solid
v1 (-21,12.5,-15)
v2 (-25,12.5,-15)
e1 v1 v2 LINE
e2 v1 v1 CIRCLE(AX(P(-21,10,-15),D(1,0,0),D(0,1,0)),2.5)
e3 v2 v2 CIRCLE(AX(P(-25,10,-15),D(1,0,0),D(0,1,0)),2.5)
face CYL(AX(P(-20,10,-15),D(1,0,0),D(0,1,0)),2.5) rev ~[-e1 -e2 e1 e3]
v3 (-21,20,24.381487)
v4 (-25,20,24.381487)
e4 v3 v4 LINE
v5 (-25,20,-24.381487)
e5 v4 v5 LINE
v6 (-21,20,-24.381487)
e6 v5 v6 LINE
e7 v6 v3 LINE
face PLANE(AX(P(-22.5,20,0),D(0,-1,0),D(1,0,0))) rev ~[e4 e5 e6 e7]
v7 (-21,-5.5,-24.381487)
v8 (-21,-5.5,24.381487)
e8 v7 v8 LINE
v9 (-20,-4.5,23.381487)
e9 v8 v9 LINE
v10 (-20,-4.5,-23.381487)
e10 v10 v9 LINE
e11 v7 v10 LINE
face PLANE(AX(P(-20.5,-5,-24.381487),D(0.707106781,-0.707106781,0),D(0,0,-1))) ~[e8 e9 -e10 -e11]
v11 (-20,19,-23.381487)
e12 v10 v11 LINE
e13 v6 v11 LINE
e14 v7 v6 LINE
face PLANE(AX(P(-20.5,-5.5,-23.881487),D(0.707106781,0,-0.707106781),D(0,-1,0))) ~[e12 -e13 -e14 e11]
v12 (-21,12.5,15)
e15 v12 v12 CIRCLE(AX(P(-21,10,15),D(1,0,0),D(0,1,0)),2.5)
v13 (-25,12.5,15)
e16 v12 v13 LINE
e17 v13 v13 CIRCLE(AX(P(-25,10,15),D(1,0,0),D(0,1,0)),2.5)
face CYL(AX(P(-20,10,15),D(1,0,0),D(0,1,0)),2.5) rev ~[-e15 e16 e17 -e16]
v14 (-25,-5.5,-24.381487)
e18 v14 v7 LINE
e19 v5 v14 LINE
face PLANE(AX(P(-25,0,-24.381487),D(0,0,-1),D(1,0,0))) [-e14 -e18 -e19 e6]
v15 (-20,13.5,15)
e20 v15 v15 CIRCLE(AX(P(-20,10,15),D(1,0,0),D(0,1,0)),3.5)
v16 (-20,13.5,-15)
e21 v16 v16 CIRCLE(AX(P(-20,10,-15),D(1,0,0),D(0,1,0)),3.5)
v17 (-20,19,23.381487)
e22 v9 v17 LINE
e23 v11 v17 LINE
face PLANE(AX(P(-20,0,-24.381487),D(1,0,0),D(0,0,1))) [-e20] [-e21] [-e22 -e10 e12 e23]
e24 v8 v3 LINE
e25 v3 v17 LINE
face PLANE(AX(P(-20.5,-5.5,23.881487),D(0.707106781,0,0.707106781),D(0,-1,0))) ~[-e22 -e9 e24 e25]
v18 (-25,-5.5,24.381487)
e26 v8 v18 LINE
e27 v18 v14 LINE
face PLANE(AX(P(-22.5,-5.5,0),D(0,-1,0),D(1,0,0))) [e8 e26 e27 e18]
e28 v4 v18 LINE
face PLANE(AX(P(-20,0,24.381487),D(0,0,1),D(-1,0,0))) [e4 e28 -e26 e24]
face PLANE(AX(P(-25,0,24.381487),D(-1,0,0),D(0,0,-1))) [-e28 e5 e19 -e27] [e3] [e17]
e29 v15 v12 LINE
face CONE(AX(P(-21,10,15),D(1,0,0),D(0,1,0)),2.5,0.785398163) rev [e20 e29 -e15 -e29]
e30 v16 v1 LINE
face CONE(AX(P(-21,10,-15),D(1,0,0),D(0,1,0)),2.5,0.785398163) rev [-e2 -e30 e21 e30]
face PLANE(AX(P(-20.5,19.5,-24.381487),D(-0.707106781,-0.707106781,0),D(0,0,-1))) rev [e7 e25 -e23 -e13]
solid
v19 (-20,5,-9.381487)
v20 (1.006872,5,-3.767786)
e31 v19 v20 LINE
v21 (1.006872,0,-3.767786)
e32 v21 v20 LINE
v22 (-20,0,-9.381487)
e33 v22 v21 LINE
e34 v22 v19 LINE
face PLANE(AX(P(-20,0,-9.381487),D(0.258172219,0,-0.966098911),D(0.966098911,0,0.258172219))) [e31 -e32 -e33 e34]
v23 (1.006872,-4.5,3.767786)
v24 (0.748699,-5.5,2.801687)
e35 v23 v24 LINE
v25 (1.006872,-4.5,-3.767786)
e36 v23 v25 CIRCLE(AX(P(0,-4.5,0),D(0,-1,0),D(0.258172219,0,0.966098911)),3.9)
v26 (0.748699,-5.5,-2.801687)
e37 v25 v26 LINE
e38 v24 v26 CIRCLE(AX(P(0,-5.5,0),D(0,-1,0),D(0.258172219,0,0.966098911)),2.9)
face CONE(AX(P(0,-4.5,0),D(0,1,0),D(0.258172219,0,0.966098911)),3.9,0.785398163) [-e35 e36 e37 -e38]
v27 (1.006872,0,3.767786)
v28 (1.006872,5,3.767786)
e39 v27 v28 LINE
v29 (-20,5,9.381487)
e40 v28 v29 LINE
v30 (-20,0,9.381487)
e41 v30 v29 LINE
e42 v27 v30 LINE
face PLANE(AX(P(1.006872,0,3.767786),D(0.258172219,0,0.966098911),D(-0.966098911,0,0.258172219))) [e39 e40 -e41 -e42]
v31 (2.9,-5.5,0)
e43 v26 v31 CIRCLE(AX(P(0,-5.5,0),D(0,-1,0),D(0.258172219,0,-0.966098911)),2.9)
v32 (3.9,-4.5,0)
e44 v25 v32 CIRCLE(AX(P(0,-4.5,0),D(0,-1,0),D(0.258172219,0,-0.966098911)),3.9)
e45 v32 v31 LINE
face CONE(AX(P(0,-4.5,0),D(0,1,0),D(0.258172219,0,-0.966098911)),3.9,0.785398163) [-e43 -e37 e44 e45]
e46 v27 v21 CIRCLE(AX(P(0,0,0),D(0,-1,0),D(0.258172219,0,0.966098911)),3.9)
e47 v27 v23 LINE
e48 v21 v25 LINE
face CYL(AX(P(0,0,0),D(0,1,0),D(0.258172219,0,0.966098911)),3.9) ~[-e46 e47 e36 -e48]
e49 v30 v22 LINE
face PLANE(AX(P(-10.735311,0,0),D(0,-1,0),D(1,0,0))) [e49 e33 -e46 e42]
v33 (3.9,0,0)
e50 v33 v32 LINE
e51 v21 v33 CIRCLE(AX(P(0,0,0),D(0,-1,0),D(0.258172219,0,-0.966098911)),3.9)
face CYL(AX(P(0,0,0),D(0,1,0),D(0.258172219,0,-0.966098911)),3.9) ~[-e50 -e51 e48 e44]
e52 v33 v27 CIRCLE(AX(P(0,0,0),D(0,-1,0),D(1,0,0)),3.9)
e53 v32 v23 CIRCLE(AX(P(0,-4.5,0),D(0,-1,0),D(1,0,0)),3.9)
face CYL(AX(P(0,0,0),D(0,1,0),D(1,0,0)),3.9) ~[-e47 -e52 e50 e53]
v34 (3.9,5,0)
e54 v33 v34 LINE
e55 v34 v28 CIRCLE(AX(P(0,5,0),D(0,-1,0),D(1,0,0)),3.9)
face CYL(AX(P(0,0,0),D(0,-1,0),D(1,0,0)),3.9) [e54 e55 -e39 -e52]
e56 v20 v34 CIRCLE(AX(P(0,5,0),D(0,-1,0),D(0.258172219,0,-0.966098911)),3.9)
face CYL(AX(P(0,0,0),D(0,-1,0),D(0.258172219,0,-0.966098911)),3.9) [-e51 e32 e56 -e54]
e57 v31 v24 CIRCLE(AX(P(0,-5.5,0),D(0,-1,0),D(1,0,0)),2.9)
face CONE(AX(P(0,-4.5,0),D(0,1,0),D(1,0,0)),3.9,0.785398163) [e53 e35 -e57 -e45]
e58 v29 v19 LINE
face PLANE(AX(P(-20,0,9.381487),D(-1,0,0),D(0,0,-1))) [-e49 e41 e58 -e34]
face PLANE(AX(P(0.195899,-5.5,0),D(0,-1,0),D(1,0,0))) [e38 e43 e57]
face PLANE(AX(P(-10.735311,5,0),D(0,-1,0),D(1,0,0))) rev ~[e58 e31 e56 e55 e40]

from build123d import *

# Parameters (mm, degrees)
F1_DEPTH  = 5.5
F2_DEPTH  = 5
F3_DEPTH  = 20
F4_R      = 2.5
F5_DEPTH  = 10
F6_SIZE   = 1
F6_2_SIZE = 1


with BuildPart() as f1:
    # F0 (on Front) → F1 (new body)
    with BuildSketch(Plane.XZ):
        with BuildLine():
            ThreePointArc((1.0068716538, -3.767785752), (3.0932830011, -2.3752053122), (3.9, 0))
            ThreePointArc((3.9, 0), (3.0932830011, 2.3752053122), (1.0068716538, 3.767785752))
            ThreePointArc((1.0068716538, 3.767785752), (-3.9, 0), (1.0068716538, -3.767785752))
        make_face()
    extrude(amount=F1_DEPTH)

    # F0 (on Front) → F2 (join)
    with BuildSketch(Plane.XZ):
        with BuildLine():
            ThreePointArc((1.0068716538, -3.767785752), (-3.9, 0), (1.0068716538, 3.767785752))
            Line((1.0068716538, 3.767785752), (-20, 9.3814870065))
            Line((-20, 9.3814870065), (-20, 0))
            Line((-20, 0), (-20, -9.3814870065))
            Line((-20, -9.3814870065), (1.0068716538, -3.767785752))
        make_face()
        with BuildLine():
            ThreePointArc((1.0068716538, -3.767785752), (3.0932830011, -2.3752053122), (3.9, 0))
            ThreePointArc((3.9, 0), (3.0932830011, 2.3752053122), (1.0068716538, 3.767785752))
            ThreePointArc((1.0068716538, 3.767785752), (-3.9, 0), (1.0068716538, -3.767785752))
        make_face()
    extrude(amount=-F2_DEPTH)

    # F6
    f6_edges = [f1.edges().sort_by_distance(p)[0] for p in [
        (-1.006872, -5.5, 3.767786),
    ]]
    chamfer(f6_edges, length=F6_SIZE)


with BuildPart() as f1b:
    # F0 (on Front) → F1, piece 2 (new body)
    with BuildSketch(Plane.XZ):
        Polygon((-20, 0), (-20, 9.3814870065), (-20, 24.3814870065), (-25, 24.3814870065), (-25, 0.7844285667), (-25, -9.3814870065), (-25, -24.3814870065), (-20, -24.3814870065), (-20, -9.3814870065), align=None)
    extrude(amount=F1_DEPTH)

    # F0 (on Front) → F3 (join)
    with BuildSketch(Plane.XZ):
        Polygon((-20, 0), (-20, 9.3814870065), (-20, 24.3814870065), (-25, 24.3814870065), (-25, 0.7844285667), (-25, -9.3814870065), (-25, -24.3814870065), (-20, -24.3814870065), (-20, -9.3814870065), align=None)
    extrude(amount=-F3_DEPTH)

    # F4 (on face) → F5 (cut)
    with BuildSketch(Plane.YZ.offset(-20)):
        with Locations((10, 15)):
            Circle(F4_R)
        with Locations((10, -15)):
            Circle(F4_R)
    extrude(amount=-F5_DEPTH, mode=Mode.SUBTRACT)

    # F6#2
    f6_2_edges = [f1b.edges().sort_by_distance(p)[0] for p in [
        (-20, 7.5, 15),
        (-20, 7.5, -15),
        (-20, 20, 0),
        (-20, 7.25, 24.381487),
        (-20, -5.5, 0),
        (-20, 7.25, -24.381487),
    ]]
    chamfer(f6_2_edges, length=F6_2_SIZE)


solid = Compound([f1.part, f1b.part])
